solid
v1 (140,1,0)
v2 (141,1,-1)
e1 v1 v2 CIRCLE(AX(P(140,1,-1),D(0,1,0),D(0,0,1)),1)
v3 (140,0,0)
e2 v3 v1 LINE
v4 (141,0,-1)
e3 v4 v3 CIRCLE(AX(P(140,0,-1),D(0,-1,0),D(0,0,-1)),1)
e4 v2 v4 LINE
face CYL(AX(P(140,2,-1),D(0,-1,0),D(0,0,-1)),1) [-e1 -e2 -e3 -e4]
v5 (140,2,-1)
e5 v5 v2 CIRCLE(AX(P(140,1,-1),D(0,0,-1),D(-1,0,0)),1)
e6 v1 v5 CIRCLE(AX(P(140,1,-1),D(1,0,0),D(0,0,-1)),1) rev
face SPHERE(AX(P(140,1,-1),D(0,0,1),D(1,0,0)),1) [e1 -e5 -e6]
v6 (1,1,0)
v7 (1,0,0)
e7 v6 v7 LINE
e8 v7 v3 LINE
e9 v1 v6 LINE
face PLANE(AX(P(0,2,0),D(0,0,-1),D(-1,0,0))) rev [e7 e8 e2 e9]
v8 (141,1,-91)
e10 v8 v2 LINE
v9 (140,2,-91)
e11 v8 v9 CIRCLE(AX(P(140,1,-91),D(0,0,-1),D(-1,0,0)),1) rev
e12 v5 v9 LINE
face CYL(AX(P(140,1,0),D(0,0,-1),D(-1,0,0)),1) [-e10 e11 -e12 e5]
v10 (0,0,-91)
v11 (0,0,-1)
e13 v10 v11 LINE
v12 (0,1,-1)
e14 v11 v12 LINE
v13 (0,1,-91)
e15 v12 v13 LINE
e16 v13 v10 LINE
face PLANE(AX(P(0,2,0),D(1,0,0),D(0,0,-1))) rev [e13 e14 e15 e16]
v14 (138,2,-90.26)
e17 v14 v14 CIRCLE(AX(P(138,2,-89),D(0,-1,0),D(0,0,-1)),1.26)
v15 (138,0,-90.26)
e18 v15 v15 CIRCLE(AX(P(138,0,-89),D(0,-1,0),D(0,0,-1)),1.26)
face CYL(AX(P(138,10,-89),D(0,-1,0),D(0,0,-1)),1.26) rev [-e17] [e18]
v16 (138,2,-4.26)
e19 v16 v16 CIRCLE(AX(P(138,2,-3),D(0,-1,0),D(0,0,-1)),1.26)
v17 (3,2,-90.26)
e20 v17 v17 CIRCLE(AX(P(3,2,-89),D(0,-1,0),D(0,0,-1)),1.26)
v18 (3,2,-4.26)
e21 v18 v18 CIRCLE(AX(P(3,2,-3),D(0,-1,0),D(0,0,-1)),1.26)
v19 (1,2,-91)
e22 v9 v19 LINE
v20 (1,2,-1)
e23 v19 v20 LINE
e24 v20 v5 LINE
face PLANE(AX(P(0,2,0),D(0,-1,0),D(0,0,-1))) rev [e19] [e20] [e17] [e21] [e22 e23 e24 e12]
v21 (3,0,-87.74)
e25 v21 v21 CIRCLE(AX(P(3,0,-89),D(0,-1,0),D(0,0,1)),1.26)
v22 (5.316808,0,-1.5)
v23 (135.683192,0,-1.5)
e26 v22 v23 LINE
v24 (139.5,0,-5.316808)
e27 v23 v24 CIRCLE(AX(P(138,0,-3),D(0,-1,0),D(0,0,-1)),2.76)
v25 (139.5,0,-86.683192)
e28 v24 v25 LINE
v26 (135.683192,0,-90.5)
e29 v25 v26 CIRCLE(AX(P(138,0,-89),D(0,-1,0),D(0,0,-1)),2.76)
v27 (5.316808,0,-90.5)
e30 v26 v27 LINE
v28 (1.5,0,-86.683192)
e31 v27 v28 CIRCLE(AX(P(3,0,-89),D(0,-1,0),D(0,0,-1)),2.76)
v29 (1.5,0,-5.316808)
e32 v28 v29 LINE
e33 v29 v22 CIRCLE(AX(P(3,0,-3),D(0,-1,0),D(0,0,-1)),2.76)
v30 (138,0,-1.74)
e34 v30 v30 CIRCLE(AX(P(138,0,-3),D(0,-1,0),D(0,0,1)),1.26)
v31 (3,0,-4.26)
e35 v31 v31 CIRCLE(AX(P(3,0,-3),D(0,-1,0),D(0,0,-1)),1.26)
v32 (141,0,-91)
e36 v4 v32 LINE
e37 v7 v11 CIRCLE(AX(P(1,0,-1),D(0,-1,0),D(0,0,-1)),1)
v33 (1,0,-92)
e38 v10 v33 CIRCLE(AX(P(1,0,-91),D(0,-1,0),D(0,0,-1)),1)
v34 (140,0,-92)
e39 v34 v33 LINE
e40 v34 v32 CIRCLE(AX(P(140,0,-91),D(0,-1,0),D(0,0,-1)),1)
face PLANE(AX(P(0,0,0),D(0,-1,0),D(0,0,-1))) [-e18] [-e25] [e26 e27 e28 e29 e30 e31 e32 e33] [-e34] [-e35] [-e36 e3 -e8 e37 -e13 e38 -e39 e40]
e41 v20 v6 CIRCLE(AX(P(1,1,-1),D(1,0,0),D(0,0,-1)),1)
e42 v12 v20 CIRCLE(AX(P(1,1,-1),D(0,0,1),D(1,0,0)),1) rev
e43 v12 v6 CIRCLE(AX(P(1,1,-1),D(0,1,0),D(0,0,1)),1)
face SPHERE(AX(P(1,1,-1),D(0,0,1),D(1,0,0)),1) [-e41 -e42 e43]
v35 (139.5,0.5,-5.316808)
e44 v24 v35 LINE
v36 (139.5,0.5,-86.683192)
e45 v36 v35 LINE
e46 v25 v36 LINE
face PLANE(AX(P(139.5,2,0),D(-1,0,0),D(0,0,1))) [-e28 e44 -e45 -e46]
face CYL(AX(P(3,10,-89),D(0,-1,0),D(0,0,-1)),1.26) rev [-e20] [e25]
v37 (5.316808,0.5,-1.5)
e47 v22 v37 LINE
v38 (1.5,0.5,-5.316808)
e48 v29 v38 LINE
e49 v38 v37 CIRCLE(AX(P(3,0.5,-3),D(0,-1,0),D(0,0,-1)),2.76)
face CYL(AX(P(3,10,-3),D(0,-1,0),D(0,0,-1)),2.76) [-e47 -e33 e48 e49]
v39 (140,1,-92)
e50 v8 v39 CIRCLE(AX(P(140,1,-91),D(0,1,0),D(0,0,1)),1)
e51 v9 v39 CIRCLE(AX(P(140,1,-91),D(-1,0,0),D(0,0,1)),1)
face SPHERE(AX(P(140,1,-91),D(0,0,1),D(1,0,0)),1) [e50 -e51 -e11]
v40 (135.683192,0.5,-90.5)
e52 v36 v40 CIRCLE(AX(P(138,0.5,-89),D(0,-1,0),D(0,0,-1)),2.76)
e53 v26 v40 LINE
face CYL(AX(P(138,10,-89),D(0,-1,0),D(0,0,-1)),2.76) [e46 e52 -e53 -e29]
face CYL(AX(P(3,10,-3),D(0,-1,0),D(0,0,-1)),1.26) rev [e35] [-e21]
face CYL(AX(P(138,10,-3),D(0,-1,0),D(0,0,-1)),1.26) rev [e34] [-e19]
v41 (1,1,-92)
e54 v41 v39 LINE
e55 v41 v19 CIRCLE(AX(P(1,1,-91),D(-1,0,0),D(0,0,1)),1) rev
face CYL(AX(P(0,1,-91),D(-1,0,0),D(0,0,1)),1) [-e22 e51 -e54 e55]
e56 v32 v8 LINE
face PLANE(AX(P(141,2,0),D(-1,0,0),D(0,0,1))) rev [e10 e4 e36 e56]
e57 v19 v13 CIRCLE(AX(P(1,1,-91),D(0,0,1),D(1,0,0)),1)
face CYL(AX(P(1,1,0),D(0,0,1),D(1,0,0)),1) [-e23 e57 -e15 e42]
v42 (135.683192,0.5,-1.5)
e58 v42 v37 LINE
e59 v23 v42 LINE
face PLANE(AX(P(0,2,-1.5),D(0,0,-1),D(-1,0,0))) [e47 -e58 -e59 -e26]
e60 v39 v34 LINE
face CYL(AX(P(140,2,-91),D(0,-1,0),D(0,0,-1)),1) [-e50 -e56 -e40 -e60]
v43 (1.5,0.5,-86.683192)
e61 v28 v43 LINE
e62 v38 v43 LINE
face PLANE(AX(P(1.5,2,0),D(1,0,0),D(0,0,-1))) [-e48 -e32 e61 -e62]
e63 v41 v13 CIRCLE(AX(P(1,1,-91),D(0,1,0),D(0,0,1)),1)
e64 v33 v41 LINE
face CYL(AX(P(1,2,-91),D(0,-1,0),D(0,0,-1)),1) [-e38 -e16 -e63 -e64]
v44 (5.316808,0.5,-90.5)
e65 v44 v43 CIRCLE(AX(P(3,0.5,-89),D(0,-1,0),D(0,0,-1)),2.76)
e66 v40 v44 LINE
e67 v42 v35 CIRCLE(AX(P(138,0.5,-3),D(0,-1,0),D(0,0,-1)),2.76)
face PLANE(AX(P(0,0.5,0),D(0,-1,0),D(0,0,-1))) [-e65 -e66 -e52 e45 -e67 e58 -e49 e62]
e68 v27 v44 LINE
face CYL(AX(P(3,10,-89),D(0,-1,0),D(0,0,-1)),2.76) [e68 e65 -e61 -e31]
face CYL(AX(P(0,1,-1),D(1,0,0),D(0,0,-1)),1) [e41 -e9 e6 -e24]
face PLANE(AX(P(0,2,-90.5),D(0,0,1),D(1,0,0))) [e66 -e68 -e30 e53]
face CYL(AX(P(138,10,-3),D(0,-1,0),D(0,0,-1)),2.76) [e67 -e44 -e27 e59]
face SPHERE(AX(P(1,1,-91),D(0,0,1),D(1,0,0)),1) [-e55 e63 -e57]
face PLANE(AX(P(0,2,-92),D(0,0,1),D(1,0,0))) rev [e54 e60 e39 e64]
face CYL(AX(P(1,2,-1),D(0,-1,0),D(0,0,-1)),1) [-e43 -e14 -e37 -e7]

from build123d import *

# Parameters (mm, degrees)
SKETCH1_W           = 141
SKETCH1_H           = 92
BOSS_EXTRUDE1_DEPTH = 2
SKETCH2_R           = 1.26
CUT_EXTRUDE1_DEPTH  = 10
FILLET1_R           = 1
SHELL1_T            = -1.5
FILLET2_R           = 1


with BuildPart() as part:
    # Sketch1 → Boss-Extrude1 (new body)
    with BuildSketch(Plane(origin=(0, 0, 0), x_dir=(1, 0, 0), z_dir=(0, 1, 0))):
        with Locations((70.5, 46)):
            Rectangle(SKETCH1_W, SKETCH1_H)
    extrude(amount=BOSS_EXTRUDE1_DEPTH)

    # Sketch2 → Cut-Extrude1 (cut)
    with BuildSketch(Plane.XZ):
        with Locations(Location((3, -3, 0), (0, 0, 270))):
            Circle(SKETCH2_R)
        with Locations(Location((138, -3, 0), (0, 0, 270))):
            Circle(SKETCH2_R)
        with Locations(Location((138, -89, 0), (0, 0, 270))):
            Circle(SKETCH2_R)
        with Locations(Location((3, -89, 0), (0, 0, 270))):
            Circle(SKETCH2_R)
    extrude(amount=-CUT_EXTRUDE1_DEPTH, mode=Mode.SUBTRACT)

    # Fillet1
    fillet1_edges = [part.edges().sort_by_distance(p)[0] for p in [
        (141, 2, -46),
        (70.5, 2, -92),
        (0, 2, -46),
        (70.5, 2, 0),
    ]]
    fillet(fillet1_edges, radius=FILLET1_R)

    # Shell1
    shell1_openings = [part.faces().sort_by_distance(p)[0] for p in [
        (70.5, 0, -46),
    ]]
    offset(amount=SHELL1_T, openings=shell1_openings, kind=Kind.INTERSECTION)

    # Fillet2
    # the kernel refuses this fillet: 1 mm, written as the material it takes off along each edge
    with BuildSketch(Plane(origin=(1, 1, -1), x_dir=(-1, 0, 0), z_dir=(0, 0, 1))) as fillet2_piece_1_section:
        Polygon((0, 0), (FILLET2_R, 0), (FILLET2_R, -FILLET2_R), (0, -FILLET2_R), align=None)
    fillet2_piece_1 = extrude(amount=FILLET2_R, mode=Mode.PRIVATE)
    fillet2_piece_1 = fillet2_piece_1 - Plane(origin=(1, 1, -1), x_dir=(0.7071067811865475, -0.7071067811865475, 0), z_dir=(0, 0, 1)) * Sphere(FILLET2_R, mode=Mode.PRIVATE)
    add(fillet2_piece_1, mode=Mode.SUBTRACT)
    with BuildSketch(Plane(origin=(1, 1, -91), x_dir=(-1, 0, 0), z_dir=(0, 0, -1))) as fillet2_piece_2_section:
        Polygon((0, 0), (FILLET2_R, 0), (FILLET2_R, FILLET2_R), (0, FILLET2_R), align=None)
    fillet2_piece_2 = extrude(amount=FILLET2_R, mode=Mode.PRIVATE)
    fillet2_piece_2 = fillet2_piece_2 - Plane(origin=(1, 1, -91), x_dir=(0.7071067811865475, -0.7071067811865475, 0), z_dir=(0, 0, -1)) * Sphere(FILLET2_R, mode=Mode.PRIVATE)
    add(fillet2_piece_2, mode=Mode.SUBTRACT)
    with BuildSketch(Plane(origin=(140, 1, -1), x_dir=(1, 0, 0), z_dir=(0, 0, 1))) as fillet2_piece_3_section:
        Polygon((0, 0), (FILLET2_R, 0), (FILLET2_R, FILLET2_R), (0, FILLET2_R), align=None)
    fillet2_piece_3 = extrude(amount=FILLET2_R, mode=Mode.PRIVATE)
    fillet2_piece_3 = fillet2_piece_3 - Plane(origin=(140, 1, -1), x_dir=(-0.7071067811865475, -0.7071067811865475, 0), z_dir=(0, 0, 1)) * Sphere(FILLET2_R, mode=Mode.PRIVATE)
    add(fillet2_piece_3, mode=Mode.SUBTRACT)
    with BuildSketch(Plane(origin=(140, 1, -91), x_dir=(0, 0, -1), z_dir=(1, 0, 0))) as fillet2_piece_4_section:
        Polygon((0, 0), (FILLET2_R, 0), (FILLET2_R, FILLET2_R), (0, FILLET2_R), align=None)
    fillet2_piece_4 = extrude(amount=FILLET2_R, mode=Mode.PRIVATE)
    fillet2_piece_4 = fillet2_piece_4 - Plane(origin=(140, 1, -91), x_dir=(0, -0.7071067811865475, 0.7071067811865475), z_dir=(1, 0, 0)) * Sphere(FILLET2_R, mode=Mode.PRIVATE)
    add(fillet2_piece_4, mode=Mode.SUBTRACT)
    with BuildSketch(Plane(origin=(141, -2.5, -92), x_dir=(0, 0, 1), z_dir=(0, 1, 0)), Plane(origin=(141, -2.5, 0), x_dir=(-1, 0, 0), z_dir=(0, 1, 0)), Plane(origin=(0, -2.5, -92), x_dir=(1, 0, 0), z_dir=(0, 1, 0))) as fillet2_piece_5:
        with BuildLine():
            CenterArc((FILLET2_R, -FILLET2_R), FILLET2_R, 90, 90)
            Line((0, -FILLET2_R), (0, 0))
            Line((0, 0), (FILLET2_R, 0))
        make_face()
    extrude(amount=3.5, mode=Mode.SUBTRACT)
    with BuildSketch(Plane(origin=(0, -2.5, 0), x_dir=(1, 0, 0), z_dir=(0, 1, 0))) as fillet2_piece_6:
        with BuildLine():
            CenterArc((FILLET2_R, FILLET2_R), FILLET2_R, 180, 90)
            Line((0, FILLET2_R), (0, 0))
            Line((0, 0), (FILLET2_R, 0))
        make_face()
    extrude(amount=3.5, mode=Mode.SUBTRACT)


solid = part.part
